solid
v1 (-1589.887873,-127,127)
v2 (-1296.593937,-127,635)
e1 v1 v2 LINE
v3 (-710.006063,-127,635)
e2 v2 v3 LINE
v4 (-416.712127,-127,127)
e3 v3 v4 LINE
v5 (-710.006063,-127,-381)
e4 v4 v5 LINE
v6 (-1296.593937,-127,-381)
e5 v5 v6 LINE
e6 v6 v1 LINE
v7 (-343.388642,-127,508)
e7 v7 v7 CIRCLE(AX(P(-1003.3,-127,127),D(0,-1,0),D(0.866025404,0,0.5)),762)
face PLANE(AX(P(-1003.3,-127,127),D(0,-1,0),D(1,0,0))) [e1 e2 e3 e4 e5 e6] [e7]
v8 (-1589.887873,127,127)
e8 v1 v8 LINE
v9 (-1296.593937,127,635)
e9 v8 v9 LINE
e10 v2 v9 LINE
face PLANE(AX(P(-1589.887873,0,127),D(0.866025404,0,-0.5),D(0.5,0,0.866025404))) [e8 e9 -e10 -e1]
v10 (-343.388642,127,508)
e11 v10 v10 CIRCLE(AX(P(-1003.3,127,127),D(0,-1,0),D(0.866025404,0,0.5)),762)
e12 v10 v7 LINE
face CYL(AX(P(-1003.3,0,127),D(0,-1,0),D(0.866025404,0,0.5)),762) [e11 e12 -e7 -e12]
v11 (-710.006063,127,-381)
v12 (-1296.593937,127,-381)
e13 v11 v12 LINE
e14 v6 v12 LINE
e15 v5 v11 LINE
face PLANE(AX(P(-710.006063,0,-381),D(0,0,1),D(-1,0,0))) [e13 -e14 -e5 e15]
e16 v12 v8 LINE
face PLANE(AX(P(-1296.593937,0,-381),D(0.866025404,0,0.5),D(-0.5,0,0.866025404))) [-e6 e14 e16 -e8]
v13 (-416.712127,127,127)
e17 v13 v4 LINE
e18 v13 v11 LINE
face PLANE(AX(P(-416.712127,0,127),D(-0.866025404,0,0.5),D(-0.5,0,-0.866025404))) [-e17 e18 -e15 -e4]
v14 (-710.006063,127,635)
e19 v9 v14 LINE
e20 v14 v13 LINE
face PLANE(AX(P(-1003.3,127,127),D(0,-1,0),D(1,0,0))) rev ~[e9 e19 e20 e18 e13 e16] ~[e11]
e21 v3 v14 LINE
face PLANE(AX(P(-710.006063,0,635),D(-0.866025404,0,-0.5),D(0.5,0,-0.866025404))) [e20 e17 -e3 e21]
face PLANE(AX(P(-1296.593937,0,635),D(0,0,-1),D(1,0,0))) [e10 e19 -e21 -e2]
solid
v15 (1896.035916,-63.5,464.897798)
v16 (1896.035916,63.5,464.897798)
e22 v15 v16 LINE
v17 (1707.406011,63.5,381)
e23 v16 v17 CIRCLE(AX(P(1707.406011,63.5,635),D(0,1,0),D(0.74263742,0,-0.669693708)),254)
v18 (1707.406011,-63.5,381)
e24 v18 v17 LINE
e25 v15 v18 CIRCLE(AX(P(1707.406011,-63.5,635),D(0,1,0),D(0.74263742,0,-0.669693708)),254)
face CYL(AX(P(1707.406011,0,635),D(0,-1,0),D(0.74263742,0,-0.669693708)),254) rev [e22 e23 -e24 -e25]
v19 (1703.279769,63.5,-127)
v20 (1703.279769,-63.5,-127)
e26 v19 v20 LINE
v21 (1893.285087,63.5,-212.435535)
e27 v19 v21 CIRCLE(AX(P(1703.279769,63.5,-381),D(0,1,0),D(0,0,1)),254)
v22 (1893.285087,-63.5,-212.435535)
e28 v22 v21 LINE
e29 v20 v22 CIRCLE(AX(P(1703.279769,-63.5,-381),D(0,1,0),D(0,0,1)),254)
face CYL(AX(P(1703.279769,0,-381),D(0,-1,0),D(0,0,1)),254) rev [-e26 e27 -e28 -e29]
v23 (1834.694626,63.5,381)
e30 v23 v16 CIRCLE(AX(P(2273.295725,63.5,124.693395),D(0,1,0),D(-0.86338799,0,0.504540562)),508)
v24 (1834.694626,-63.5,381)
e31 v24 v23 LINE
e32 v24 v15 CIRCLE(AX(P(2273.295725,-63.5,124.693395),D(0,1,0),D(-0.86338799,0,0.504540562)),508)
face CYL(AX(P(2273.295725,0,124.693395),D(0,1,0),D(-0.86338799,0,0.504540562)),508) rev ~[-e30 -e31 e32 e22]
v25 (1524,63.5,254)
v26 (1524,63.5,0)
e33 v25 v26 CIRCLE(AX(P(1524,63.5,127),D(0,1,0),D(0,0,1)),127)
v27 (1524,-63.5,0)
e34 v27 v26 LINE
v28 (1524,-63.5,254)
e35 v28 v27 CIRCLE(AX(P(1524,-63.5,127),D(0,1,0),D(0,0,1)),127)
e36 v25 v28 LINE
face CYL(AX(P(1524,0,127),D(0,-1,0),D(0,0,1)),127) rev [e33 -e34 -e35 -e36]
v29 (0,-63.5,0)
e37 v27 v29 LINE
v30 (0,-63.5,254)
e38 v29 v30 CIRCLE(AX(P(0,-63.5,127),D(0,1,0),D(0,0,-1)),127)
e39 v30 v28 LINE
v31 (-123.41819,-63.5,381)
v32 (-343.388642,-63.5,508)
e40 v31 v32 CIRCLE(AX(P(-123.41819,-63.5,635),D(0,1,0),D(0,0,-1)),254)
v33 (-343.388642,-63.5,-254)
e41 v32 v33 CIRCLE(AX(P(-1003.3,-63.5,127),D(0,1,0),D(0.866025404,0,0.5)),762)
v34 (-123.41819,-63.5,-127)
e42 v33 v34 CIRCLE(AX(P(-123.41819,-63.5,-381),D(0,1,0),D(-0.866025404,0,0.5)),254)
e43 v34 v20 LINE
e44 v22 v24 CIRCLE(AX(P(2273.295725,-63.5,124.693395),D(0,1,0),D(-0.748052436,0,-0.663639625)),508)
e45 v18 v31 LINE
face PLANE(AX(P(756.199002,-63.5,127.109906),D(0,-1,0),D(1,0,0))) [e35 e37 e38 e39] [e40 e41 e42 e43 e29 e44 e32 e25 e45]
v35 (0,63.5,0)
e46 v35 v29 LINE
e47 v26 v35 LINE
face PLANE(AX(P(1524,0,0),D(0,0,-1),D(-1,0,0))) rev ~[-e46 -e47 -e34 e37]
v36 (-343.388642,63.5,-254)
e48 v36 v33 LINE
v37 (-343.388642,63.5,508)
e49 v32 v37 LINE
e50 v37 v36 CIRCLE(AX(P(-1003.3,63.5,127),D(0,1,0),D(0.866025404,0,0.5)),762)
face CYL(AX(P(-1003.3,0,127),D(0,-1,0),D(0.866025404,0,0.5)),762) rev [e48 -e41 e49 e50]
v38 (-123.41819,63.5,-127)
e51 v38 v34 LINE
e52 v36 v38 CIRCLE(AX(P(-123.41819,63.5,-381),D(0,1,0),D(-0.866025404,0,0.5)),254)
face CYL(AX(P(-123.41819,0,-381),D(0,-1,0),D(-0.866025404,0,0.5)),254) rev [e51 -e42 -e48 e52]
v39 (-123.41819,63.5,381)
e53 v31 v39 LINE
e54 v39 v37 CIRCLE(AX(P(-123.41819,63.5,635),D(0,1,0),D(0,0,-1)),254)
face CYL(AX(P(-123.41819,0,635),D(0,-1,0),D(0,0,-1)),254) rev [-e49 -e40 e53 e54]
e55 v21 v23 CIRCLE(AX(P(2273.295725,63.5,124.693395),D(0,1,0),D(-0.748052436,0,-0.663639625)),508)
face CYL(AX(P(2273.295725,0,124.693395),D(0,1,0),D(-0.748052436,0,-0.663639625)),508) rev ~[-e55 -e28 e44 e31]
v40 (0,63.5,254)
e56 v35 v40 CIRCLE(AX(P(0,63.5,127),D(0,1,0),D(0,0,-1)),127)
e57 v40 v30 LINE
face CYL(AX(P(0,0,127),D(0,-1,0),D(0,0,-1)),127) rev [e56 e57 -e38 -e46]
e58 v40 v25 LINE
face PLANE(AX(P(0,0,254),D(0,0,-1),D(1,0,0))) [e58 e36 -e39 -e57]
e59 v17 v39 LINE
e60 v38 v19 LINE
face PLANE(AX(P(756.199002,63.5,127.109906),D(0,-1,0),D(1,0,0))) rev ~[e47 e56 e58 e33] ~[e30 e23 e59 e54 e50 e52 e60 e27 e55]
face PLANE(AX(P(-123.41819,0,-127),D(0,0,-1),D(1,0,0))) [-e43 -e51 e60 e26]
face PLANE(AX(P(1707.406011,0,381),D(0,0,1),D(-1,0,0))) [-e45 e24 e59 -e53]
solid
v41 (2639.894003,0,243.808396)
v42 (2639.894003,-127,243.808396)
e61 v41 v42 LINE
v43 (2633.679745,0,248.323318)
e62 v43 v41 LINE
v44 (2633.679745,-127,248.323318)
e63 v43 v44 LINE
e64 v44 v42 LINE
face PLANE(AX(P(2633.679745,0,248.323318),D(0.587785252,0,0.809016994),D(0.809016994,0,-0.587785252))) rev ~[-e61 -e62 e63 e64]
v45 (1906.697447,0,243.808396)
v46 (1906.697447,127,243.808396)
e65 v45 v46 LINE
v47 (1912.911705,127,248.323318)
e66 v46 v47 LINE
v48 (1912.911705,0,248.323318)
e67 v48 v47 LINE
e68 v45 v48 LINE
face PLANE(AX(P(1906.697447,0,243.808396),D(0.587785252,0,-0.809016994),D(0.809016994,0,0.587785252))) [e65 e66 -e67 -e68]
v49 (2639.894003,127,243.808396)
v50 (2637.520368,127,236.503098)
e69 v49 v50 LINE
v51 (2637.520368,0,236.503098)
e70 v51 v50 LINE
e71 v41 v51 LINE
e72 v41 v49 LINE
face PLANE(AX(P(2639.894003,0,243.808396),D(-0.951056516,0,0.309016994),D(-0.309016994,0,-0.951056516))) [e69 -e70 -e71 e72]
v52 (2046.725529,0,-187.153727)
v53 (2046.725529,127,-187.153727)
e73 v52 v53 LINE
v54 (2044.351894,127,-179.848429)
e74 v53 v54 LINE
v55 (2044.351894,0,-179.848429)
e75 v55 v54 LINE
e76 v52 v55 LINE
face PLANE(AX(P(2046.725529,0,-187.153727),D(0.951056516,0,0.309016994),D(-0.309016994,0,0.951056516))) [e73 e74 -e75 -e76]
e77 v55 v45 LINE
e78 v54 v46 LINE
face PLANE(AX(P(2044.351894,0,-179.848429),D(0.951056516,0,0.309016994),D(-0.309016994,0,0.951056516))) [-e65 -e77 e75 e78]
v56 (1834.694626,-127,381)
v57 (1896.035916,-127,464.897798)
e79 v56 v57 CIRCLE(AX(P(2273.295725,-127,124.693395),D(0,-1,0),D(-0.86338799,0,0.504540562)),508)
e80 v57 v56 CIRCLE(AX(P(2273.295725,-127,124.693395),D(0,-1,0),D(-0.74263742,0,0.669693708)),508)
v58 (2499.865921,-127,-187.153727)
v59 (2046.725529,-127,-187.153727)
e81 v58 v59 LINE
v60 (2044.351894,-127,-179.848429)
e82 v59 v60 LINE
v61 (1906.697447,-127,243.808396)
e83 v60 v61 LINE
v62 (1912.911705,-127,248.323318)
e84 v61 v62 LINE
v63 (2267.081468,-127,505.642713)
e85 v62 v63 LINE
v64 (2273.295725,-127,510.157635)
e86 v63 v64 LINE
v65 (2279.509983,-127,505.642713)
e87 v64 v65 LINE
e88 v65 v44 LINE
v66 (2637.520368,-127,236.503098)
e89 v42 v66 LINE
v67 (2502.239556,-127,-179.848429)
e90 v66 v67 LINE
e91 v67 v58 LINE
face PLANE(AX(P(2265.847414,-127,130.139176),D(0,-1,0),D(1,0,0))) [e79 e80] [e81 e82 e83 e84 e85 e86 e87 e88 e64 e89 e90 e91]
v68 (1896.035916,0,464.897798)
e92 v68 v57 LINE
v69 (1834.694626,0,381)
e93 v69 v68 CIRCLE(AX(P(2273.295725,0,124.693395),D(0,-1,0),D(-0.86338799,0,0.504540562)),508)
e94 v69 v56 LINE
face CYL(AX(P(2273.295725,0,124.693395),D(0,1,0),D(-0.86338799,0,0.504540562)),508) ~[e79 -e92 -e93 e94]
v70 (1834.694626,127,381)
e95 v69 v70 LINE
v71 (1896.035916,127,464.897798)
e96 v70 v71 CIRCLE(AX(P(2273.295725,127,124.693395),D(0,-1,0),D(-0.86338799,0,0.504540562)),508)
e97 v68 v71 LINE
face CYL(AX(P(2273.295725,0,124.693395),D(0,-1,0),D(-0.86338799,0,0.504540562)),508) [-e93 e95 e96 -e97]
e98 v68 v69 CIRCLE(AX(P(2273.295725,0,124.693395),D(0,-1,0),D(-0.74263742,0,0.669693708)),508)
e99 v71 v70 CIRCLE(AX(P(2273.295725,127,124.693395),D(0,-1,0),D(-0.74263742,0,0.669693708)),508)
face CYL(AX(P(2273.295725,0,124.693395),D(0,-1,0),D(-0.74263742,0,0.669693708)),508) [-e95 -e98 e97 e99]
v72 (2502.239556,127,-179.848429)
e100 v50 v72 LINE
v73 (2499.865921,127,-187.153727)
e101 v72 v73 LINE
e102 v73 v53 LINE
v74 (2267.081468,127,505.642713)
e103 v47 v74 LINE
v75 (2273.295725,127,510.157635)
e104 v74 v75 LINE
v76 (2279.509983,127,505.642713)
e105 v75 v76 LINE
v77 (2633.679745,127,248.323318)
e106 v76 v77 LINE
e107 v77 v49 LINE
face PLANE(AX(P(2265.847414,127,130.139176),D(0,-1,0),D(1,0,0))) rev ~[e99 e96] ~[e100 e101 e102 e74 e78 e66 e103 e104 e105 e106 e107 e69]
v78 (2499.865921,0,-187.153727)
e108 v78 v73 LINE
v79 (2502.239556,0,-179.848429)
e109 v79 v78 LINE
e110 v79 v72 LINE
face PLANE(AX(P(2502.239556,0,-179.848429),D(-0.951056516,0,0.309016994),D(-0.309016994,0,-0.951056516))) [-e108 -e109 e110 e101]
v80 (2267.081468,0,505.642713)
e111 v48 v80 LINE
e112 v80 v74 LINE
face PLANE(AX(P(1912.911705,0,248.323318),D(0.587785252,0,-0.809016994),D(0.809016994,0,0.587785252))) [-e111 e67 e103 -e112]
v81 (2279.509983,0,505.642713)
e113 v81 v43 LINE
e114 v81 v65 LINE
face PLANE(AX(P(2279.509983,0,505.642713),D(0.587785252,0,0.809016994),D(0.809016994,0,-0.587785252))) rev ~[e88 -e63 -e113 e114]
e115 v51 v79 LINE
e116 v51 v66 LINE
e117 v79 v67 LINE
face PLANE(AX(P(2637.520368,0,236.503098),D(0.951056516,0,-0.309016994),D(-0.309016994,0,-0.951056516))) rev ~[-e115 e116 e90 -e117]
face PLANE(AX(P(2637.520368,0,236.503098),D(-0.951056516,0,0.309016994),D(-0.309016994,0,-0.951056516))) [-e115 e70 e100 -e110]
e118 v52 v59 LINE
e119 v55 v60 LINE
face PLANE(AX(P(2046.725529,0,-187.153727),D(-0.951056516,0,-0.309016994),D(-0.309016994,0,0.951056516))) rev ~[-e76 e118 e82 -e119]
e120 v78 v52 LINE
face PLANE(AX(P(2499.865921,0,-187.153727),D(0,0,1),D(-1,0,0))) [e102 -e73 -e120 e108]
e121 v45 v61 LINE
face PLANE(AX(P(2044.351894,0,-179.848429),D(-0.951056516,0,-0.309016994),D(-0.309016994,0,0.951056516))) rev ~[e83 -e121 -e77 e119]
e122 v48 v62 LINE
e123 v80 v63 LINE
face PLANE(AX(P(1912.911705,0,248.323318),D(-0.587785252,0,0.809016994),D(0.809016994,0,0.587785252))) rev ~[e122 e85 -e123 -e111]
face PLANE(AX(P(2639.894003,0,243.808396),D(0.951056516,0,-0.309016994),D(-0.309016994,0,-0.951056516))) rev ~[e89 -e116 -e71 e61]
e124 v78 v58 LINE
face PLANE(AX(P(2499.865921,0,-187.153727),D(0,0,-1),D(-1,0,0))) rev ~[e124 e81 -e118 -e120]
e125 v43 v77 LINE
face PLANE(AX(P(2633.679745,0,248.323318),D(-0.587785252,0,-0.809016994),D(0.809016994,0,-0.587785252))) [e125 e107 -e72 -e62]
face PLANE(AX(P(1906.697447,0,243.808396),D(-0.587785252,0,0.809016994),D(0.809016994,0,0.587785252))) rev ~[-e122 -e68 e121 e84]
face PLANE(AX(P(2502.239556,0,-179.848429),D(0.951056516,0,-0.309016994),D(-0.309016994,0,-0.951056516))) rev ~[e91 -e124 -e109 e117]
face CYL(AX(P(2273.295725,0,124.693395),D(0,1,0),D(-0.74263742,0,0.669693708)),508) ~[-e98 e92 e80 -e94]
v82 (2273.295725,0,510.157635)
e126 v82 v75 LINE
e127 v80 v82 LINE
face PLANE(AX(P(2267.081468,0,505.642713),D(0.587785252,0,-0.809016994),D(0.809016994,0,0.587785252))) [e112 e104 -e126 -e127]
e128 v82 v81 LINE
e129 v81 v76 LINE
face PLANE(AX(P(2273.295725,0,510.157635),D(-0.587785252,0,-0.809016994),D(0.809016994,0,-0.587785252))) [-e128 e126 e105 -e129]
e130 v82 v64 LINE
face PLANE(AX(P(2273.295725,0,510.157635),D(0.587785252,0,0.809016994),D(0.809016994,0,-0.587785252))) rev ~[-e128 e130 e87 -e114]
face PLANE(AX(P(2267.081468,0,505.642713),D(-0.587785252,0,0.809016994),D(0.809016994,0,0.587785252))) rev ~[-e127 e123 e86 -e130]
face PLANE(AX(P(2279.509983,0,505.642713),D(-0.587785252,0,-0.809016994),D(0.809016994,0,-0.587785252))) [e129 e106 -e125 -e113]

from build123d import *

# Parameters (mm, degrees)
F1_DEPTH = 127
F2_DEPTH = 63.5


with BuildPart() as f1:
    # F0 (on Front) → F1 (new body, symmetric)
    with BuildSketch(Plane.XZ):
        with BuildLine():
            ThreePointArc((-343.3886423163, -254), (-267.2645203677, -70.2201123681), (-241.3, 127))
            ThreePointArc((-241.3, 127), (-267.2645203677, 324.2201123681), (-343.3886423163, 508))
            ThreePointArc((-343.3886423163, 508), (-1765.3, 127), (-343.3886423163, -254))
        make_face()
        Polygon((-416.7121265033, 127), (-710.0060632517, -381), (-1296.5939367483, -381), (-1589.8878734967, 127), (-1296.5939367483, 635), (-710.0060632517, 635), align=None, mode=Mode.SUBTRACT)
    extrude(amount=F1_DEPTH, both=True)


with BuildPart() as f1b:
    # F0 (on Front) → F1, piece 2 (new body, symmetric)
    with BuildSketch(Plane.XZ):
        with BuildLine():
            ThreePointArc((2781.2957251752, 124.6933945575), (2455.5263714034, 598.8832210777), (1896.0359158238, 464.8977981858))
            ThreePointArc((1896.0359158238, 464.8977981858), (1863.2140679876, 424.521736177), (1834.6946262179, 381))
            ThreePointArc((1834.6946262179, 381), (1767.7537116518, 74.7807452315), (1893.2850874873, -212.4355351475))
            ThreePointArc((1893.2850874873, -212.4355351475), (2453.599075192, -350.2326017543), (2781.2957251752, 124.6933945575))
        make_face()
        Polygon((2273.2957251752, 510.157635163), (2279.5099828097, 505.6427127116), (2633.6797453674, 248.3233180798), (2639.8940030018, 243.8083956284), (2637.5203678003, 236.5030976454), (2502.2395562907, -179.8484288332), (2499.8659210892, -187.1537268162), (2492.1846762233, -187.1537268162), (2054.4067741271, -187.1537268162), (2046.7255292612, -187.1537268162), (2044.3518940597, -179.8484288332), (1909.0710825501, 236.5030976455), (1906.6974473486, 243.8083956284), (1912.911704983, 248.3233180798), (2267.0814675408, 505.6427127116), align=None, mode=Mode.SUBTRACT)
    extrude(amount=F1_DEPTH, both=True)


with BuildPart() as f2:
    # F0 (on Front) → F2 (new body, symmetric)
    with BuildSketch(Plane.XZ):
        with BuildLine():
            ThreePointArc((-343.3886423163, 508), (-267.2645203677, 324.2201123681), (-241.3, 127))
            ThreePointArc((-241.3, 127), (-267.2645203677, -70.2201123681), (-343.3886423163, -254))
            ThreePointArc((-343.3886423163, -254), (-250.418189755, -161.0295474388), (-123.418189755, -127))
            Line((-123.418189755, -127), (1651, -127))
            Line((1651, -127), (1703.2797686434, -127))
            ThreePointArc((1703.2797686434, -127), (1807.4446041865, -149.3414429893), (1893.2850874873, -212.4355351475))
            ThreePointArc((1893.2850874873, -212.4355351475), (1767.7537116518, 74.7807452315), (1834.6946262179, 381))
            ThreePointArc((1834.6946262179, 381), (1863.2140679876, 424.521736177), (1896.0359158238, 464.8977981858))
            ThreePointArc((1896.0359158238, 464.8977981858), (1810.6291692551, 402.920316205), (1707.406011148, 381))
            Line((1707.406011148, 381), (1651, 381))
            Line((1651, 381), (-123.418189755, 381))
            ThreePointArc((-123.418189755, 381), (-250.418189755, 415.0295474388), (-343.3886423163, 508))
        make_face()
        with BuildLine():
            Line((1524, 0), (0, 0))
            ThreePointArc((0, 0), (-127, 127), (0, 254))
            Line((0, 254), (1524, 254))
            ThreePointArc((1524, 254), (1651, 127), (1524, 0))
        make_face(mode=Mode.SUBTRACT)
    extrude(amount=F2_DEPTH, both=True)


solid = Compound([f1.part, f1b.part, f2.part])
